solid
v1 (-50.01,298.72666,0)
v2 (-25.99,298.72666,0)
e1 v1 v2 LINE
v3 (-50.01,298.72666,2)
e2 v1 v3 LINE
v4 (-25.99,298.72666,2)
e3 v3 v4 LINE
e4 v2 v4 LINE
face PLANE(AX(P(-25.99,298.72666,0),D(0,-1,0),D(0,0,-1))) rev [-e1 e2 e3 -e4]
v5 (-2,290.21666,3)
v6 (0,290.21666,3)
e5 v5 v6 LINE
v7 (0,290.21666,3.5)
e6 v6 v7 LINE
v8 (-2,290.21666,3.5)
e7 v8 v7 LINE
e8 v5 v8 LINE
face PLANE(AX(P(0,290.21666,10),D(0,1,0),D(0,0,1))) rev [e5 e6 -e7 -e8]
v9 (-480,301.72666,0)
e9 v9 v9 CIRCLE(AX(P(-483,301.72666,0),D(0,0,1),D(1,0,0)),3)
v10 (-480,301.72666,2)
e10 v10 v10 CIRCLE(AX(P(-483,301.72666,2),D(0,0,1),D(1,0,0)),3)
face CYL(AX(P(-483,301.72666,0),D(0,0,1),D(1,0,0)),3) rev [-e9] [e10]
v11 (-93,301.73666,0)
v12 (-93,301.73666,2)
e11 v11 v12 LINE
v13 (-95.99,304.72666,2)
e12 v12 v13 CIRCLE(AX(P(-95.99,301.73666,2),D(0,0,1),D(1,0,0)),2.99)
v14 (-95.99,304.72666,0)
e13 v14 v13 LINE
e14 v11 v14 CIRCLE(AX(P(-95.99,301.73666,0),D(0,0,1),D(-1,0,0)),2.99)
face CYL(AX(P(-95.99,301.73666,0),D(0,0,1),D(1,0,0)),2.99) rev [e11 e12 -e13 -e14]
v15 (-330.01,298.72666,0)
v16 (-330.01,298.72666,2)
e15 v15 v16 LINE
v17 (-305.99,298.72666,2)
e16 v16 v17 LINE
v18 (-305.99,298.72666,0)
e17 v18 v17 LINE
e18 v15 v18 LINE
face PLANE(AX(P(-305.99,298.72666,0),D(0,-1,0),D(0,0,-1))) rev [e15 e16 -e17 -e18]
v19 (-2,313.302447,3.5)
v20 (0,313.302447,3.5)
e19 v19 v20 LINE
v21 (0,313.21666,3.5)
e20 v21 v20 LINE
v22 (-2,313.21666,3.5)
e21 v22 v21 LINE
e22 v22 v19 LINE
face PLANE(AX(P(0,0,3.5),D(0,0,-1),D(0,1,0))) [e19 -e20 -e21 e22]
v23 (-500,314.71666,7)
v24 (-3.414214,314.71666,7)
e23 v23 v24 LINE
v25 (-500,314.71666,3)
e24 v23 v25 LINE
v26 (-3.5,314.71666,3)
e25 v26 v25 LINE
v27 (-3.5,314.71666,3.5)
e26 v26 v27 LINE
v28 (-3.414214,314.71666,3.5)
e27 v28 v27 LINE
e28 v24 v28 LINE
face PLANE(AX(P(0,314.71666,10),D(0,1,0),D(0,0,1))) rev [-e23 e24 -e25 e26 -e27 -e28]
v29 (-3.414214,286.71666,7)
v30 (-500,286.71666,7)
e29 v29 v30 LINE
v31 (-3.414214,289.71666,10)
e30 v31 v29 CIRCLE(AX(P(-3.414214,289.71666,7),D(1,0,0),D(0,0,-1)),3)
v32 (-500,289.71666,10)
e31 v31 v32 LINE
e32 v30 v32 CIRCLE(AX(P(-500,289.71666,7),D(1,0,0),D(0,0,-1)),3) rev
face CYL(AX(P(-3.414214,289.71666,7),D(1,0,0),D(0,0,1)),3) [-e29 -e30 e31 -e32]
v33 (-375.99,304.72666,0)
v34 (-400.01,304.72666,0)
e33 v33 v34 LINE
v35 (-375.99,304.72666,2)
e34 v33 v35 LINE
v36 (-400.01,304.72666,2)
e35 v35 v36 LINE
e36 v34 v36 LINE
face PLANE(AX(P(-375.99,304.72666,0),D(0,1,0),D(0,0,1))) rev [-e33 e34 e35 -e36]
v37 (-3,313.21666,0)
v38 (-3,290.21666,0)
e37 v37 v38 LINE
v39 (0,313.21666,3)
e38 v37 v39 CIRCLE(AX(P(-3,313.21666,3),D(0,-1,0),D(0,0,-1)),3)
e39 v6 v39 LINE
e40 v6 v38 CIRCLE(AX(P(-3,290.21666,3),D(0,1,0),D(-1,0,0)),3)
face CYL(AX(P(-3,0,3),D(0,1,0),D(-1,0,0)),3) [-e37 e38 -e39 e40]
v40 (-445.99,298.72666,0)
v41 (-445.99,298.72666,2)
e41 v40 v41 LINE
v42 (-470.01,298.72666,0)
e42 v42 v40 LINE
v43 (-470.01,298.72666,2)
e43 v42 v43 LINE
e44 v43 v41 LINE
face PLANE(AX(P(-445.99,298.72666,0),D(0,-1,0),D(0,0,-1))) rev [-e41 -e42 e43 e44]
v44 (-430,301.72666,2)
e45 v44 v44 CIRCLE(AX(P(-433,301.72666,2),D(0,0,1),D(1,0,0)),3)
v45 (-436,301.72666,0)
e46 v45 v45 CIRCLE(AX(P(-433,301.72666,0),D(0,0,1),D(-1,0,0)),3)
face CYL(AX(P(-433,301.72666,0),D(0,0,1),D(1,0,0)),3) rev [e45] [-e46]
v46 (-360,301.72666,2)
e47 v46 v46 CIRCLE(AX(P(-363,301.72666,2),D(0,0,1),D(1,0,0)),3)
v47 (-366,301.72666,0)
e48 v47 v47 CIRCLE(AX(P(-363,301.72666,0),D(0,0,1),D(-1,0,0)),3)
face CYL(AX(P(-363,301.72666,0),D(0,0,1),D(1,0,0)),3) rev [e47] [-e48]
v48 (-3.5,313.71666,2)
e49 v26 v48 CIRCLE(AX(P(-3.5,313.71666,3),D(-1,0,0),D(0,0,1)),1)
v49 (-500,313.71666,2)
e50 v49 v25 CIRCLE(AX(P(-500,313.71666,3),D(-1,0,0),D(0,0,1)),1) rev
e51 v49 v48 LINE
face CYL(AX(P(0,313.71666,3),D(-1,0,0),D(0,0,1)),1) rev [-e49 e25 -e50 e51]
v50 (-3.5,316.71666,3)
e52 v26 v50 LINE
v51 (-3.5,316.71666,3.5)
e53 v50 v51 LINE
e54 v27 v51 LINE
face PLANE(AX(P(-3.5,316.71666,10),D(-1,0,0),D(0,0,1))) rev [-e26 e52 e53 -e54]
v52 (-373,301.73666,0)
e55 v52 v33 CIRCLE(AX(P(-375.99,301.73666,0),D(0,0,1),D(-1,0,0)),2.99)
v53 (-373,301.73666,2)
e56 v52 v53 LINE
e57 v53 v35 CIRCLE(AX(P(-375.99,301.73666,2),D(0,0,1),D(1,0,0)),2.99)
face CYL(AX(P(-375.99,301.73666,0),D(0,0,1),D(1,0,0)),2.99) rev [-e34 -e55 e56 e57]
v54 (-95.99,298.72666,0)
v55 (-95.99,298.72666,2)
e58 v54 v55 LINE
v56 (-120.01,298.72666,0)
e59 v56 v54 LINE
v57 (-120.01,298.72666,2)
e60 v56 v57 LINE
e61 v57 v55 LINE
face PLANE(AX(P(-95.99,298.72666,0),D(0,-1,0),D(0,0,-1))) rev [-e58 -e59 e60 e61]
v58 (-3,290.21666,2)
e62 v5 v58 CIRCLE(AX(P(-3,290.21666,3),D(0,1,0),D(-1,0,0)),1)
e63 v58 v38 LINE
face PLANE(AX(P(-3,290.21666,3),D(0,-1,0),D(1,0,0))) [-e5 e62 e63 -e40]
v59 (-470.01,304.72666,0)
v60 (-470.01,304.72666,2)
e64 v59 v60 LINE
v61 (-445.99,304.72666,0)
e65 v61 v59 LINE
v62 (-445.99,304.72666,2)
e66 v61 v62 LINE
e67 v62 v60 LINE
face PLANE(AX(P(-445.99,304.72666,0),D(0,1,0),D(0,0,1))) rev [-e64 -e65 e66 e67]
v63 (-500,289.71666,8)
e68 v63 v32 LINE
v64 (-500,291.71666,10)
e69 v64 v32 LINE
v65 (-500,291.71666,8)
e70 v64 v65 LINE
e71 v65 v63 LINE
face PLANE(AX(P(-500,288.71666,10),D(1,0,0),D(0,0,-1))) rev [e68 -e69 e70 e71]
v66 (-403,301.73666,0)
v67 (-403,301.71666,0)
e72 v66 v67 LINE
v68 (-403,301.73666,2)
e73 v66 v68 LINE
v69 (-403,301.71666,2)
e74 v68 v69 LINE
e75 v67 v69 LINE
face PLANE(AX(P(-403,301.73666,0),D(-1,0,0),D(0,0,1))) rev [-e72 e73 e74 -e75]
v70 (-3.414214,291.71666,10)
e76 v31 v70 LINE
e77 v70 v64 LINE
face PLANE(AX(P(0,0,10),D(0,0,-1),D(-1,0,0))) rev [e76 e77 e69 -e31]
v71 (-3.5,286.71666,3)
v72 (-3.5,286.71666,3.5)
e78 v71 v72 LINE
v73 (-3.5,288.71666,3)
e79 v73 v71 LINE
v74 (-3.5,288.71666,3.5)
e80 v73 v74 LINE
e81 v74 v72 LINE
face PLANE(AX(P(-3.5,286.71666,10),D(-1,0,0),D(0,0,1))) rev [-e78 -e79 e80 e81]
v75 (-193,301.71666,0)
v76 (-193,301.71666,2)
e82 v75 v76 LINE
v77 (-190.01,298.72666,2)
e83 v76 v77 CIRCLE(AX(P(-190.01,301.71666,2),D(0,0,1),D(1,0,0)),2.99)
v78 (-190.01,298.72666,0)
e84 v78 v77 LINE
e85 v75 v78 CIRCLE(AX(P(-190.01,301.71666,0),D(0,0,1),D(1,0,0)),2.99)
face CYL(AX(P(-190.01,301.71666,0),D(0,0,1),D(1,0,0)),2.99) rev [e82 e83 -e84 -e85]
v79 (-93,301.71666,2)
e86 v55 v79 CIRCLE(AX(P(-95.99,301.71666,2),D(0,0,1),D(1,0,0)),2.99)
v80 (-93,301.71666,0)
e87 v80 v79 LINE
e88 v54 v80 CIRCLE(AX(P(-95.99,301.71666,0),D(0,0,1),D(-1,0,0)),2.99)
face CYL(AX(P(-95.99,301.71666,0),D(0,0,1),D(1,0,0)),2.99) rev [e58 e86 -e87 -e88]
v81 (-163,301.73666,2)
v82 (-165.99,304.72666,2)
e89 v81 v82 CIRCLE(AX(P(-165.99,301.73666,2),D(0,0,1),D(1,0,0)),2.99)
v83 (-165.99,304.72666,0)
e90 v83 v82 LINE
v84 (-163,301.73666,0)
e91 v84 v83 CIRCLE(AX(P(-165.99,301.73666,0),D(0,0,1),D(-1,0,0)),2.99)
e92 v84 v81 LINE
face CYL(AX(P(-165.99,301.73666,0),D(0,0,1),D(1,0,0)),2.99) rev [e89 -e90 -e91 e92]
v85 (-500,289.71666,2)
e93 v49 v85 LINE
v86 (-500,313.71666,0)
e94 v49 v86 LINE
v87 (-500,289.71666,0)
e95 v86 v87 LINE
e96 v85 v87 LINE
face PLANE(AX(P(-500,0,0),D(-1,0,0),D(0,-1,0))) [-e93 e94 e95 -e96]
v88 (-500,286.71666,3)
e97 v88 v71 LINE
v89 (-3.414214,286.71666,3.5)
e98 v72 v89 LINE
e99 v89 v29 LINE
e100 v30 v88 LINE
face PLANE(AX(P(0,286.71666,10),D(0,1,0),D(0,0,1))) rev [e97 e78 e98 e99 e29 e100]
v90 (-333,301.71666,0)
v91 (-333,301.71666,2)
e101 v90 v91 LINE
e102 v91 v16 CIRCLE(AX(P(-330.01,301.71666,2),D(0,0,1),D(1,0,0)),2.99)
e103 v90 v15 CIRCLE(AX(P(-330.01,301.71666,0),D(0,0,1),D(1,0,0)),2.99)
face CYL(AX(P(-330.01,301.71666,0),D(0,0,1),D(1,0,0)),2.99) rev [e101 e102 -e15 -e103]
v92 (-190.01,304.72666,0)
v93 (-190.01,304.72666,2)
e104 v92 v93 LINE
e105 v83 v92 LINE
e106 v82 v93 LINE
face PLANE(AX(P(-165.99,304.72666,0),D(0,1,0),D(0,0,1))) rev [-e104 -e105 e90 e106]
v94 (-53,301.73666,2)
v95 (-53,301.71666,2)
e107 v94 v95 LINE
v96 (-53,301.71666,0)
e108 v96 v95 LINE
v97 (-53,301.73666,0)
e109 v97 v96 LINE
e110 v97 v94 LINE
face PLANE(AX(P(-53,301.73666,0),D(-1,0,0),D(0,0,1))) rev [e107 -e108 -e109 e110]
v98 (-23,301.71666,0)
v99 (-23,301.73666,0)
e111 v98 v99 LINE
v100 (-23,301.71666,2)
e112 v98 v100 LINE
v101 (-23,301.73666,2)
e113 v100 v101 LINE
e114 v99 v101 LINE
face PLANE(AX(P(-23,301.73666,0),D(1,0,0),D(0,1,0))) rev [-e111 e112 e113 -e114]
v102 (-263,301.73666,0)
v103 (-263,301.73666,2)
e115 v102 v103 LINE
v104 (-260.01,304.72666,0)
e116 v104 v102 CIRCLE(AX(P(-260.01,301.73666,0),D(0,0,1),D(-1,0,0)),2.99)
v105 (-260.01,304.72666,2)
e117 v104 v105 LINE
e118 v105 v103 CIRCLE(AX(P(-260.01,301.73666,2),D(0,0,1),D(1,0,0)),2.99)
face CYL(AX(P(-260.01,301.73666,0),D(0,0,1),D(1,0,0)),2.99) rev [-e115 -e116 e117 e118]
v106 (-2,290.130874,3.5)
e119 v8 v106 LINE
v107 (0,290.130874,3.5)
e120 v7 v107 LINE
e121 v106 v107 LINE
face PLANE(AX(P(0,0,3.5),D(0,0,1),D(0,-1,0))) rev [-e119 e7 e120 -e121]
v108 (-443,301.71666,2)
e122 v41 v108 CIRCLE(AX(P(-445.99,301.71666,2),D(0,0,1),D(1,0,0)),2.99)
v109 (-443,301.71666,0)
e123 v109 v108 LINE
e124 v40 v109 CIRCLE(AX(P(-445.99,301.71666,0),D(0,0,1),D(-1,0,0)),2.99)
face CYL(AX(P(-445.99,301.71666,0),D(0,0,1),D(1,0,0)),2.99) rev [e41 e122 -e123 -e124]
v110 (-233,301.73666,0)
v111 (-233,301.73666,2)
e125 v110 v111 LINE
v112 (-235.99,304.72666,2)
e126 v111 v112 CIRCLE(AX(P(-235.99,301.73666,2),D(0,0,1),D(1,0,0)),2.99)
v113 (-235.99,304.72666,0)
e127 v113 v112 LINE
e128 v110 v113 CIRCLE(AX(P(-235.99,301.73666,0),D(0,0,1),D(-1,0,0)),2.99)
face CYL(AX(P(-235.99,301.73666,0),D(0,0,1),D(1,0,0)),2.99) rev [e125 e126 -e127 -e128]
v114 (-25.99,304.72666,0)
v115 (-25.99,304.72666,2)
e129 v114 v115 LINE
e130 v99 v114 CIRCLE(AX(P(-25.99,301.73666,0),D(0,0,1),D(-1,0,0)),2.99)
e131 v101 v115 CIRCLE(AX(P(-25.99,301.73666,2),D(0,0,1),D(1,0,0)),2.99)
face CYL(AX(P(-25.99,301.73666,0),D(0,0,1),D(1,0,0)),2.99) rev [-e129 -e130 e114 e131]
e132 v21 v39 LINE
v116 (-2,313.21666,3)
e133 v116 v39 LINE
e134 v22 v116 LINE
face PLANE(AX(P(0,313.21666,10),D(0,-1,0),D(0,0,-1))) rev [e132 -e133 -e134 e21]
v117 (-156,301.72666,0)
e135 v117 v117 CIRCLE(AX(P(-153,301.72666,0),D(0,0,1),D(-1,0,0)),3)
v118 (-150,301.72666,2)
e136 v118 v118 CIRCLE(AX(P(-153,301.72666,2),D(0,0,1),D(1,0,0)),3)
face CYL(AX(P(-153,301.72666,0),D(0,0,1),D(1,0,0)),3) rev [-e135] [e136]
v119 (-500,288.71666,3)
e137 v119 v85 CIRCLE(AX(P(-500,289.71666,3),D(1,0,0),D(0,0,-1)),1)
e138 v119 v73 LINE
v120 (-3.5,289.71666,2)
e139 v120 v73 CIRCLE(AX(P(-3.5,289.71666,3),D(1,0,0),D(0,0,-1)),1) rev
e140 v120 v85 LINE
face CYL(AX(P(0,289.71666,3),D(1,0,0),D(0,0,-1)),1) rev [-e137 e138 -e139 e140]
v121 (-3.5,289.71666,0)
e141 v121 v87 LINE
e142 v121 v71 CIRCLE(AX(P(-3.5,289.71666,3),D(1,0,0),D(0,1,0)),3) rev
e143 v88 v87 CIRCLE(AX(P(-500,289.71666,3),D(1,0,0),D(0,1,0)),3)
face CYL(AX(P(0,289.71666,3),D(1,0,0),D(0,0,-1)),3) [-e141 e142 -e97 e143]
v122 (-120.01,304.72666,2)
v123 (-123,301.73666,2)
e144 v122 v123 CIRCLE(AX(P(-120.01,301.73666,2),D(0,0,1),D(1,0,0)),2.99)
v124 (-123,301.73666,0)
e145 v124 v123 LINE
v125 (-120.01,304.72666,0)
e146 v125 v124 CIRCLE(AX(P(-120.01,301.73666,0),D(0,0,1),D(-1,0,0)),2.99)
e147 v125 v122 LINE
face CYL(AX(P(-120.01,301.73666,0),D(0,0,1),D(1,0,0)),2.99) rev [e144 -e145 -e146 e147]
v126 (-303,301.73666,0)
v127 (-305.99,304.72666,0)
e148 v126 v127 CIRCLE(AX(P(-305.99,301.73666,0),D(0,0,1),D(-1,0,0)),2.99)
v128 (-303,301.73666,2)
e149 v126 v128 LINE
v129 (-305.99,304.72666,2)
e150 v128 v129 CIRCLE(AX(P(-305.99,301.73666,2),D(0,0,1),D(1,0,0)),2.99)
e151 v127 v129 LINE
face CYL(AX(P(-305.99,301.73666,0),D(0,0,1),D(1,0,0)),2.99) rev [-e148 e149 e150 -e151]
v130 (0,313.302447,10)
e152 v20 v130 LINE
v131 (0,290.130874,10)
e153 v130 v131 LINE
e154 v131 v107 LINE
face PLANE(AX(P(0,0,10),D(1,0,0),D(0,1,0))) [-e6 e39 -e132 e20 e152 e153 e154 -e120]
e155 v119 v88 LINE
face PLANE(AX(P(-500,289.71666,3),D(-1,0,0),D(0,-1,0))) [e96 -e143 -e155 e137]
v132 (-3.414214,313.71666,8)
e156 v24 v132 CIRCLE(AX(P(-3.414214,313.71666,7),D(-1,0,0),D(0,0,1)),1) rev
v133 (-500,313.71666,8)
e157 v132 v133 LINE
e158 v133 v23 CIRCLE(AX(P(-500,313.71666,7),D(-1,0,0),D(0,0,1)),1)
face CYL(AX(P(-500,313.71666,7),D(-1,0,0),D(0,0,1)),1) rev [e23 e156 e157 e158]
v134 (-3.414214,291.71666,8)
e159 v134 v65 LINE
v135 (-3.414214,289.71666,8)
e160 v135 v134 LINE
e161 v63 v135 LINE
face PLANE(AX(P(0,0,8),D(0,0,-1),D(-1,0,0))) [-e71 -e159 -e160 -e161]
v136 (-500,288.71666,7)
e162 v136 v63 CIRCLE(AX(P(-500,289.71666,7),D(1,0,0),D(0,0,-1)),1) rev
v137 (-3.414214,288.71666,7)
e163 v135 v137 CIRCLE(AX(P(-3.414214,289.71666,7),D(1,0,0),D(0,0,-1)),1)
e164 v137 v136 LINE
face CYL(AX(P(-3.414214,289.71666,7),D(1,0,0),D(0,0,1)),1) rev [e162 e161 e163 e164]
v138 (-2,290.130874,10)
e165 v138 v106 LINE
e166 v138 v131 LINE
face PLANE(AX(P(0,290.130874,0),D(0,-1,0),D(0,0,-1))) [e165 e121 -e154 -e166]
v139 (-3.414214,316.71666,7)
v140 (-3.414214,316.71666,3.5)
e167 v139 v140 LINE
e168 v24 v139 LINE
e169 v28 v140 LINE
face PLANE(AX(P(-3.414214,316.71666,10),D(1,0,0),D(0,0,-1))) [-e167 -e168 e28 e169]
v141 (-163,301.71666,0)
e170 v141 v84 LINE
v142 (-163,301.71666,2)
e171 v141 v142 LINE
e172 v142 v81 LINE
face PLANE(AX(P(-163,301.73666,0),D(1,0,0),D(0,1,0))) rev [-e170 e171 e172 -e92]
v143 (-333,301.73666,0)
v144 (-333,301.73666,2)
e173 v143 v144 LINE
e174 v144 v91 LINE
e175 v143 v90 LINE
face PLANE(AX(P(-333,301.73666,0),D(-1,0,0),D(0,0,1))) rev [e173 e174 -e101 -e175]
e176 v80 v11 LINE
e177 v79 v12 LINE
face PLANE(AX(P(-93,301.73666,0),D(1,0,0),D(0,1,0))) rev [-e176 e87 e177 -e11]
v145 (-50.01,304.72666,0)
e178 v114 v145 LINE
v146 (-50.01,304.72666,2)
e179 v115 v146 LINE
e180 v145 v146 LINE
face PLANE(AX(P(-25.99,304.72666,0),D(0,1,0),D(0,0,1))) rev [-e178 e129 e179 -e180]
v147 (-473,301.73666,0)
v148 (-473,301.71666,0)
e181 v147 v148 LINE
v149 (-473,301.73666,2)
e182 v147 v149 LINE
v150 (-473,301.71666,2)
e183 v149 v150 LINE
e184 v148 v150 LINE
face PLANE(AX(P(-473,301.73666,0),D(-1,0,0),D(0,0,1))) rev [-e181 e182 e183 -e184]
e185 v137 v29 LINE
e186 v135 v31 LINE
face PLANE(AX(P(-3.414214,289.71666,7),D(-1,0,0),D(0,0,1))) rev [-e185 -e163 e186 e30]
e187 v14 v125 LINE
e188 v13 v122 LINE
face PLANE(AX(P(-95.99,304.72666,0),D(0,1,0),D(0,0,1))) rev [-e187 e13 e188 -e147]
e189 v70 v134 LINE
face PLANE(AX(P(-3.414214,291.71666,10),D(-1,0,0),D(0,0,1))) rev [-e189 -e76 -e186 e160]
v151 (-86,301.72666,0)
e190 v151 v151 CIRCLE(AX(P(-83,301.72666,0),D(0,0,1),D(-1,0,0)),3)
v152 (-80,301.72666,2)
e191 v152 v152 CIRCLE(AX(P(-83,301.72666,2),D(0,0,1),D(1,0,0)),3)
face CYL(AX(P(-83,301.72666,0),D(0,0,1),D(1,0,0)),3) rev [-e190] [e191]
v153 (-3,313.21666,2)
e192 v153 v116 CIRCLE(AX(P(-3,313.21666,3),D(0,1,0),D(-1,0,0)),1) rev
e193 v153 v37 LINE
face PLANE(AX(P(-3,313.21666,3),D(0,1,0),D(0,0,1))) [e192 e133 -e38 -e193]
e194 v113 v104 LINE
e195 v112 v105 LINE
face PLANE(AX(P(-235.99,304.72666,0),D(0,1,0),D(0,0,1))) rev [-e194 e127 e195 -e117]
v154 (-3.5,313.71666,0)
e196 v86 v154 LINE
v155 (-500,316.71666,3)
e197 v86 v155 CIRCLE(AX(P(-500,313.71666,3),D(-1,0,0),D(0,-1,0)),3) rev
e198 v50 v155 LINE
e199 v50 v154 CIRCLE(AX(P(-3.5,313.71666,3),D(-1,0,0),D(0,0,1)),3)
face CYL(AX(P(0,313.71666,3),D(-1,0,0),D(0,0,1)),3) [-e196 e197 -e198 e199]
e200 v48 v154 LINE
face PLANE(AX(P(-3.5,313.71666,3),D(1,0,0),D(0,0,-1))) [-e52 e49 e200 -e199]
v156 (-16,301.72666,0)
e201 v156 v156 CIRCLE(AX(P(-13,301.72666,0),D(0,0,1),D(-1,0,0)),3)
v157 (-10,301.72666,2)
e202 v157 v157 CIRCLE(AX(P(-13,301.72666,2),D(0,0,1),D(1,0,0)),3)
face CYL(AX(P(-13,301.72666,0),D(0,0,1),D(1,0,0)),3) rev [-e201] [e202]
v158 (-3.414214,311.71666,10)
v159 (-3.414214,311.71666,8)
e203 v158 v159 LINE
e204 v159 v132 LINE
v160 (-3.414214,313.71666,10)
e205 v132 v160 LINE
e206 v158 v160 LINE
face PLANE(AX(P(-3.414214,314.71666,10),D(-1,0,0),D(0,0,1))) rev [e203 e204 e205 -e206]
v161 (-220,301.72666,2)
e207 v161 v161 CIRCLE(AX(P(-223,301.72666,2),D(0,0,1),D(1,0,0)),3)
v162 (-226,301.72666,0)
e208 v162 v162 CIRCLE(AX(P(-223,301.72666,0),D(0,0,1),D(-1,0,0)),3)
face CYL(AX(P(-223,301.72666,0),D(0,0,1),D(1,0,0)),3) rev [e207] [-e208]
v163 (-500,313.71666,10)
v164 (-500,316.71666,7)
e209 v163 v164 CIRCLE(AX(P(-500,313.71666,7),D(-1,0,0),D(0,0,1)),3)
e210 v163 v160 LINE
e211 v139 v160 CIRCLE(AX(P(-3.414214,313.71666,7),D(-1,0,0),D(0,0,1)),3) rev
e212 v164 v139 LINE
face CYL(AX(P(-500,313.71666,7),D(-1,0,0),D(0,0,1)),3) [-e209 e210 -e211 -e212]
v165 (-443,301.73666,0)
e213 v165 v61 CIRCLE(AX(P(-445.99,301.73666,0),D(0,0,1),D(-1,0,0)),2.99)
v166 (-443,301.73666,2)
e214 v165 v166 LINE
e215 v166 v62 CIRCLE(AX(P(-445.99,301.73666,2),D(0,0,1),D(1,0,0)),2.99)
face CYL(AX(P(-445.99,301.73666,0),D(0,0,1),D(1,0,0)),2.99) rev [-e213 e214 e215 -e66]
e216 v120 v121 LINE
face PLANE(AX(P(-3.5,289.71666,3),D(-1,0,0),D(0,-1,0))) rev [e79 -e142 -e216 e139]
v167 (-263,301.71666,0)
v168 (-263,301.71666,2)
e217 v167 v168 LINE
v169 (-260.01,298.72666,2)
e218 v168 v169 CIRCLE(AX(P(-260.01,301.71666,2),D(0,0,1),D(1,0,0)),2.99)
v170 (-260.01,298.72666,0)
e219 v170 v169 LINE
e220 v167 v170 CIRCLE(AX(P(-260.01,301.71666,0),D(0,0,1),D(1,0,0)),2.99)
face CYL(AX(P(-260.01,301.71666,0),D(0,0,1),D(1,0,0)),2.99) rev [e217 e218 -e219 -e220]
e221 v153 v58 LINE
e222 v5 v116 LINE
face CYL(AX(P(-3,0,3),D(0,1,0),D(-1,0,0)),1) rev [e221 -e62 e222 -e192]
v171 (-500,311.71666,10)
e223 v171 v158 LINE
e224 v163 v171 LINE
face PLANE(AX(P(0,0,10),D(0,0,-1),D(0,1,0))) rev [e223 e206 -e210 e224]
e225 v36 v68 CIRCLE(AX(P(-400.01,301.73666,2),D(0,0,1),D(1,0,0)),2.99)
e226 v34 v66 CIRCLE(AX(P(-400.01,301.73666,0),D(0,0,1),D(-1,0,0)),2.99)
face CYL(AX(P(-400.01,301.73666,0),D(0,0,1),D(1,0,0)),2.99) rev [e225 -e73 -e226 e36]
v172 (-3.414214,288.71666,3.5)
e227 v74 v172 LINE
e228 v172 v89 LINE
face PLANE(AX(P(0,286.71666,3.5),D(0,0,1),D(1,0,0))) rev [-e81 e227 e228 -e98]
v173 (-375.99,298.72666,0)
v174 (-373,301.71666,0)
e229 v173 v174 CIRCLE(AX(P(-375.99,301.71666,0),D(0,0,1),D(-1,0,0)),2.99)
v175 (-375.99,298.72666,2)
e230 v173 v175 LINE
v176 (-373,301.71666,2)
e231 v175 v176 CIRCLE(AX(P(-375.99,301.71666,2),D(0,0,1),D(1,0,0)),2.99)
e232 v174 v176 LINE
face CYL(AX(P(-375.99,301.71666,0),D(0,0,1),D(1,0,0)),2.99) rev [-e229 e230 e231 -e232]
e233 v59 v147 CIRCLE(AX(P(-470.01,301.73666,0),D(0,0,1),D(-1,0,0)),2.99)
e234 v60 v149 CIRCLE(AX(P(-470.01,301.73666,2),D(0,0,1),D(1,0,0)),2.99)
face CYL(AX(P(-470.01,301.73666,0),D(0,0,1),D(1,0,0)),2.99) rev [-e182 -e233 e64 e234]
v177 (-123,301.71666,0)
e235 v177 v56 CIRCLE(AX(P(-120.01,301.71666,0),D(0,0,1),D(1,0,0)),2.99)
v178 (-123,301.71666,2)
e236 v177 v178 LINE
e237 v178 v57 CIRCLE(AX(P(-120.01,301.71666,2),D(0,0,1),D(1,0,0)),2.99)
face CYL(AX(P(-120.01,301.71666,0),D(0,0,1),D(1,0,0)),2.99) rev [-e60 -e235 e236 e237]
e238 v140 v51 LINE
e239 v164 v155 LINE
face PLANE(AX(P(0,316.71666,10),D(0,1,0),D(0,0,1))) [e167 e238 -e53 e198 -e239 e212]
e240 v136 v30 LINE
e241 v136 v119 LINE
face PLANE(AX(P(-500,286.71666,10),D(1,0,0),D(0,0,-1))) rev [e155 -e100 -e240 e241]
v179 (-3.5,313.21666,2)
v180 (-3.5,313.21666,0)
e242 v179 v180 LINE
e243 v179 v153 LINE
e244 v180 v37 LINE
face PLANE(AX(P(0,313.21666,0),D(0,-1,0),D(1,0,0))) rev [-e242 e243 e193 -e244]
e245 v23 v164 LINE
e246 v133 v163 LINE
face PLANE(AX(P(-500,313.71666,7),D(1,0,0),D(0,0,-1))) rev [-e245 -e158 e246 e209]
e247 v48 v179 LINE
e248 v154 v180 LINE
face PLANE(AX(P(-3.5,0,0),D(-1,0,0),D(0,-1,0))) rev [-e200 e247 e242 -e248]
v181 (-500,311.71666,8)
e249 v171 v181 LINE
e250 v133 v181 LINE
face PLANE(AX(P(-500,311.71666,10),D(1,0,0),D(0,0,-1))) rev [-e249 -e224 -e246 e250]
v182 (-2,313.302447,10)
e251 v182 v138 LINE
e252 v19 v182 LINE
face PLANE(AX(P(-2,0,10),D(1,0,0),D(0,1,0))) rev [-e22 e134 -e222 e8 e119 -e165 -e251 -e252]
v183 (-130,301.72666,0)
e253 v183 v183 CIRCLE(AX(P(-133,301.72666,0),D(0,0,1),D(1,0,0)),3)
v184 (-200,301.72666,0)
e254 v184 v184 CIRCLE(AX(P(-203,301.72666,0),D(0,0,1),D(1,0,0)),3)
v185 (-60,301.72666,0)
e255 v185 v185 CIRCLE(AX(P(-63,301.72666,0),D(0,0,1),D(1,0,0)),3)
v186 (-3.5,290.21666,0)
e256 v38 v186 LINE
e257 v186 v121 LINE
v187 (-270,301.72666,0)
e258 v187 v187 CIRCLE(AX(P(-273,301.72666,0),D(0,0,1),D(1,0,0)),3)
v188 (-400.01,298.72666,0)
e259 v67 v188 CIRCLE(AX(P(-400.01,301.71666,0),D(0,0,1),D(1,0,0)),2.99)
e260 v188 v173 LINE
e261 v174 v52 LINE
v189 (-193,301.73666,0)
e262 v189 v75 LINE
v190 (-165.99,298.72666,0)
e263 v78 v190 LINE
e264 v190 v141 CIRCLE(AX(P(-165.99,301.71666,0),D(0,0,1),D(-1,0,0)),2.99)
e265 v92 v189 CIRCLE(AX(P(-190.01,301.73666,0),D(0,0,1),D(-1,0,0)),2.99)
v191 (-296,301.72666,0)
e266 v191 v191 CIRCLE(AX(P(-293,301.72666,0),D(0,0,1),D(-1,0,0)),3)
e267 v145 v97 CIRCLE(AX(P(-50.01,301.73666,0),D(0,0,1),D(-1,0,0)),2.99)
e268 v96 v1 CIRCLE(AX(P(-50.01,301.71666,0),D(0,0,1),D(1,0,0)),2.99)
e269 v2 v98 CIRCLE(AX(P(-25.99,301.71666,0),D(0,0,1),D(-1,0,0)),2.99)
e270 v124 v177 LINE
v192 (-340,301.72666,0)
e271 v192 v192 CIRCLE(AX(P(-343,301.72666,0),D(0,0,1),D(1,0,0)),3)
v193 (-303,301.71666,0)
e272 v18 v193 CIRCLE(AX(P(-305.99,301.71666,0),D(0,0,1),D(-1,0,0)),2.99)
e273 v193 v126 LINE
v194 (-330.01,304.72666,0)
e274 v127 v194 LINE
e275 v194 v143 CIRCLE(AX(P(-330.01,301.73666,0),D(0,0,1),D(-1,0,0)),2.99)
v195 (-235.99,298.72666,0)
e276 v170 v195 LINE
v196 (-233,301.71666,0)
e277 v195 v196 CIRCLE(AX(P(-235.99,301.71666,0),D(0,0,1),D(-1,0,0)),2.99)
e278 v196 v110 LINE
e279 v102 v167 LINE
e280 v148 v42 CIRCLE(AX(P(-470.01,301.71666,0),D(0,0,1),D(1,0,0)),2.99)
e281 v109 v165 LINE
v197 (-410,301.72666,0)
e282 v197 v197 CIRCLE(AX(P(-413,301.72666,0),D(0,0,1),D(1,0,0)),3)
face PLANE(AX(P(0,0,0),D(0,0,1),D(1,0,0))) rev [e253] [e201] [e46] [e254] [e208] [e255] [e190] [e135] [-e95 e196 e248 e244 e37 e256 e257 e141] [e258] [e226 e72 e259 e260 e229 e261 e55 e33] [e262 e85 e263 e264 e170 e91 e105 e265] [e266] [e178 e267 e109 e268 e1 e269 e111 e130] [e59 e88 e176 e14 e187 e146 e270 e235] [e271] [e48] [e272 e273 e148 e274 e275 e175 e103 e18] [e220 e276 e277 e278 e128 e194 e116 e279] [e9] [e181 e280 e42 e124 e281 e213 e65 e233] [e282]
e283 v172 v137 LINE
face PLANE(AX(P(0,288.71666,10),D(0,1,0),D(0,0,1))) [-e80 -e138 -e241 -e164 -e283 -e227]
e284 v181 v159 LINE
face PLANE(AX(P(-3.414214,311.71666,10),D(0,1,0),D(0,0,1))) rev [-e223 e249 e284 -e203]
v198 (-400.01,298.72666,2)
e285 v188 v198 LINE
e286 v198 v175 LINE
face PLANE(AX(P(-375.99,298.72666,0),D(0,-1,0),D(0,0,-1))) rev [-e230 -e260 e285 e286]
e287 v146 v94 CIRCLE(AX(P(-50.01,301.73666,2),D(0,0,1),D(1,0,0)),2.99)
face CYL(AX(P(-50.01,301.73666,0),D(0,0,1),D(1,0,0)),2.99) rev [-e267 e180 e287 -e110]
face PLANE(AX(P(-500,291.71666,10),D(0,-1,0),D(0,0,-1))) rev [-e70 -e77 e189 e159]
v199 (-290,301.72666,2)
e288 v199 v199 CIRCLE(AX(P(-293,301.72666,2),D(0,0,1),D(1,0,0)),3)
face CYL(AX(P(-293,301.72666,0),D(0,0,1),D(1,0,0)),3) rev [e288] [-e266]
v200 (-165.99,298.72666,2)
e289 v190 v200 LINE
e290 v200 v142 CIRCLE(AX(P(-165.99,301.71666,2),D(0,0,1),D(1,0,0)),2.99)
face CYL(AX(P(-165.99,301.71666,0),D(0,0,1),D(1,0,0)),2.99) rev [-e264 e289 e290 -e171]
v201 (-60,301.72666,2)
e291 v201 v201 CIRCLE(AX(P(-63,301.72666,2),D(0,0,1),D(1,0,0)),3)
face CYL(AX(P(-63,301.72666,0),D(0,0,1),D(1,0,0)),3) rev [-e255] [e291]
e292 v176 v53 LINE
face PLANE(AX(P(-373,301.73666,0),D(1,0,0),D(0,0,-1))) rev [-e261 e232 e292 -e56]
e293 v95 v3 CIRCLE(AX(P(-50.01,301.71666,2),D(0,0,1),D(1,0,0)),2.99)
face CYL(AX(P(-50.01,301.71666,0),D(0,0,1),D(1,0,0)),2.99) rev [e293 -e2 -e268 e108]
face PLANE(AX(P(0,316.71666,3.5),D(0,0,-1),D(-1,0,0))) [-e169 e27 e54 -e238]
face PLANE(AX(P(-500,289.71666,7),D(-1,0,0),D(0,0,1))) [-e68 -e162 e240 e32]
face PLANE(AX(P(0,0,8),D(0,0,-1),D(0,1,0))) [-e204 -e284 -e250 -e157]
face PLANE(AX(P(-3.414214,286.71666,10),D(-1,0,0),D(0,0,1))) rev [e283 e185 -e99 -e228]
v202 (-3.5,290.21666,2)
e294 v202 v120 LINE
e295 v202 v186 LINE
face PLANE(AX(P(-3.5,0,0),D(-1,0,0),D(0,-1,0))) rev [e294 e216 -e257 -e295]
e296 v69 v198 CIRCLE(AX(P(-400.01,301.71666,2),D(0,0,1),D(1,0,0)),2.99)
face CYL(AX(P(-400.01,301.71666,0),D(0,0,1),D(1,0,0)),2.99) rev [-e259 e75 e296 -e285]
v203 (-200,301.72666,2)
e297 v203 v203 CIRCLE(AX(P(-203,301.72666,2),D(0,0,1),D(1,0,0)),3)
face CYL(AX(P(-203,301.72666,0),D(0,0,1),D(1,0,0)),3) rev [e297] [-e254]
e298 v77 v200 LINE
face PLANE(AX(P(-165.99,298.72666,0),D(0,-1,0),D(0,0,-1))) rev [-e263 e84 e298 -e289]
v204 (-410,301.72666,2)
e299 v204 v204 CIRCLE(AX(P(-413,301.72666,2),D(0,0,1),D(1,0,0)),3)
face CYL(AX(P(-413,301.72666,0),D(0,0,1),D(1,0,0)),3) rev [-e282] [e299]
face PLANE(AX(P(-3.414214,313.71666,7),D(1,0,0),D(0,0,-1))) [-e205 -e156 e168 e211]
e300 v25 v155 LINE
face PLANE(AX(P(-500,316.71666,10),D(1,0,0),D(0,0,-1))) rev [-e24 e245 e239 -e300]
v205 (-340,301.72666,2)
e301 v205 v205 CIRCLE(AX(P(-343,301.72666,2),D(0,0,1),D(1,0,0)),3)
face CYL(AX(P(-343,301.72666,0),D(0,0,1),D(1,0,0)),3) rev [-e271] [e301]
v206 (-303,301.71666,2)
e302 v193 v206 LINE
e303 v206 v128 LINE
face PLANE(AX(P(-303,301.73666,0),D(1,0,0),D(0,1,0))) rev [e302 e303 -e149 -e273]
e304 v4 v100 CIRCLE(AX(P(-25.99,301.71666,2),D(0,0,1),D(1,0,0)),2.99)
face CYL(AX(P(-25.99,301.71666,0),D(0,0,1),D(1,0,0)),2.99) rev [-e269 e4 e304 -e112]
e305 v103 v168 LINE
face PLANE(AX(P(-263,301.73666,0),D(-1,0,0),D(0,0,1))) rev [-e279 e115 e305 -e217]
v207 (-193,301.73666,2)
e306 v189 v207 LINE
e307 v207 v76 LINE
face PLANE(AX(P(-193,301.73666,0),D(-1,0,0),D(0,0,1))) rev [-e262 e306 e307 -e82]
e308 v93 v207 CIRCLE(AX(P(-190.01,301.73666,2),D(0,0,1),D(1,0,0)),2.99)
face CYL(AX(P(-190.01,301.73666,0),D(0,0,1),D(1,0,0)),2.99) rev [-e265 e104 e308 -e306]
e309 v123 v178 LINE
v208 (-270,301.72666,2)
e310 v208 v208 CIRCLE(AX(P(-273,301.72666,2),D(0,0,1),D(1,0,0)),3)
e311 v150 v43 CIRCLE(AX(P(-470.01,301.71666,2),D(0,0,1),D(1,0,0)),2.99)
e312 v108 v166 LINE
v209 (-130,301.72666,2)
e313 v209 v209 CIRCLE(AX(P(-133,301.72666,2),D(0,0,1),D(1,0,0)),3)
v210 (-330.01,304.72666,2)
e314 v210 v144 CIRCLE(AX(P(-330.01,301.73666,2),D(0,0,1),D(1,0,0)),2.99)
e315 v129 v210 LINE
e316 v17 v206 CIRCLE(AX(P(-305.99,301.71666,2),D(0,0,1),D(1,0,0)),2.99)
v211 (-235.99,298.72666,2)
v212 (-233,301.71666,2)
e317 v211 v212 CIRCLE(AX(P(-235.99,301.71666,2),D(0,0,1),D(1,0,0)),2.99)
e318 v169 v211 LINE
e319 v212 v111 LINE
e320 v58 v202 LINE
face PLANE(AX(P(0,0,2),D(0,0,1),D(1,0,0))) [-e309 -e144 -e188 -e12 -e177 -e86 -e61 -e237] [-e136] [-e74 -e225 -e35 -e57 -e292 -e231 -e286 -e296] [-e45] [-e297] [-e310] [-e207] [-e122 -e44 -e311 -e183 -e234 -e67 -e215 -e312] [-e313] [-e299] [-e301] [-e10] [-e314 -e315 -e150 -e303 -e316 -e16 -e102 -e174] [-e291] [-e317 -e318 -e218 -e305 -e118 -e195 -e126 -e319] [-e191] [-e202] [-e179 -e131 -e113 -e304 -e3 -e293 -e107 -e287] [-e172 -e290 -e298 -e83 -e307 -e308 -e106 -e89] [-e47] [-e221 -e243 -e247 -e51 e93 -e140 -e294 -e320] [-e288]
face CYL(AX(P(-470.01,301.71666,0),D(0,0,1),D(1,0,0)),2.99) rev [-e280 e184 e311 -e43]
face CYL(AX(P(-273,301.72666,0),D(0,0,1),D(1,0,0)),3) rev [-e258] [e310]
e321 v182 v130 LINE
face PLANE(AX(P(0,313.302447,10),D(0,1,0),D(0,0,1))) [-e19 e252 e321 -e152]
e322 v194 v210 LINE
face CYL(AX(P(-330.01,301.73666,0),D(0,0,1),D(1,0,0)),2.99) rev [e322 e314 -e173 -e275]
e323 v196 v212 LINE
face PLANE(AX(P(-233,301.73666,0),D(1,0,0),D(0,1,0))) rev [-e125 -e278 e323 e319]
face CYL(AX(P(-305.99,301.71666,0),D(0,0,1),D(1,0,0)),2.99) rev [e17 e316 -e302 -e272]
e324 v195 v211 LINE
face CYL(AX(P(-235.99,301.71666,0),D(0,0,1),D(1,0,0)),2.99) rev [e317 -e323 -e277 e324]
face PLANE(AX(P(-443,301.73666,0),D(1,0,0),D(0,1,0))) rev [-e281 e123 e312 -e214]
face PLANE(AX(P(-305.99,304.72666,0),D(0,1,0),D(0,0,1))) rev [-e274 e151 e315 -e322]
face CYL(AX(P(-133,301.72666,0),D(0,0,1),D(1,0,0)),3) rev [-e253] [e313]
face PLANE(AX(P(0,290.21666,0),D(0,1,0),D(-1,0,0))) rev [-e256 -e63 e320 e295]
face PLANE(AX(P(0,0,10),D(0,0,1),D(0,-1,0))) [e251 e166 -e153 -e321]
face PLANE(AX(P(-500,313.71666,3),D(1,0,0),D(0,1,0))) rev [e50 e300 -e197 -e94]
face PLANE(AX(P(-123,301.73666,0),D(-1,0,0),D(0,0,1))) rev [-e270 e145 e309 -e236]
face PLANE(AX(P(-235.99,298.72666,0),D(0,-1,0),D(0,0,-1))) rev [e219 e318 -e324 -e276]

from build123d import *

# Parameters (mm, degrees)
SKETCH2_W                      = 500
SKETCH2_H                      = 30
BOSS_EXTRUDE1_DEPTH            = 10
CONVERT_SOLID1_START           = -500
CONVERT_SOLID1_DEPTH           = 497
CONVERT_SOLID1_START_2         = -3.414213562
CONVERT_SOLID1_2_DEPTH         = 3.414213562
CONVERT_SOLID1_START_3         = -3.5
CONVERT_SOLID1_3_DEPTH         = 0.085786438
CONVERT_SOLID1_START_4         = 290.130873959
CONVERT_SOLID1_4_DEPTH         = 23.171572876
EDGE_FLANGE1_STRIP_W           = 10
EDGE_FLANGE1_STRIP_H           = 2
EDGE_FLANGE1_STRIP_CUT_DEPTH   = 496.585786438
EDGE_FLANGE1_STRIP_2_W         = 10
EDGE_FLANGE1_STRIP_2_H         = 2
EDGE_FLANGE1_STRIP_CUT_2_DEPTH = 496.585786438
EDGE_FLANGE1_DEPTH             = 496.585786438
EDGE_FLANGE1_BEND_DEPTH        = 496.585786438
CUT_EXTRUDE1_DEPTH             = 592.923511083
CUT_EXTRUDE1_DEPTH_BACK        = 592.923511083
SKETCH43_R                     = 3


with BuildPart() as part:
    # Sketch2 → Boss-Extrude1 (new body)
    with BuildSketch(Plane.XY):
        with Locations((-250, 301.716660397)):
            Rectangle(SKETCH2_W, SKETCH2_H)
    extrude(amount=BOSS_EXTRUDE1_DEPTH)

    # Convert-Solid1: read off the stored shape, not the designer's step
    # Convert-Solid1 outline → Convert-Solid1 (cut)
    with BuildSketch(Plane.YZ.offset(CONVERT_SOLID1_START)):
        with BuildLine():
            Line((314.716660397, 3), (314.716660397, 10))
            Line((314.716660397, 10), (288.716660397, 10))
            Line((288.716660397, 10), (288.716660397, 3))
            ThreePointArc((288.716660397, 3), (289.009553616, 2.292893219), (289.716660397, 2))
            Line((289.716660397, 2), (313.716660397, 2))
            ThreePointArc((313.716660397, 2), (314.423767178, 2.292893219), (314.716660397, 3))
        make_face()
        with BuildLine():
            Line((316.716660397, 0), (316.716660397, 3))
            ThreePointArc((316.716660397, 3), (315.837980741, 0.878679656), (313.716660397, 0))
            Line((313.716660397, 0), (316.716660397, 0))
        make_face()
        with BuildLine():
            Line((286.716660397, 0), (289.716660397, 0))
            ThreePointArc((289.716660397, 0), (287.595340053, 0.878679656), (286.716660397, 3))
            Line((286.716660397, 3), (286.716660397, 0))
        make_face()
    extrude(amount=CONVERT_SOLID1_DEPTH, mode=Mode.SUBTRACT)

    # Convert-Solid1 2 outline → Convert-Solid1 2 (cut)
    with BuildSketch(Plane.YZ.offset(CONVERT_SOLID1_START_2)):
        Polygon((316.716660397, 10), (313.302446835, 10), (313.302446835, 3.5), (313.216660397, 3.5), (313.216660397, 0), (316.716660397, 0), align=None)
        Polygon((290.130873959, 3.5), (290.130873959, 10), (286.716660397, 10), (286.716660397, 0), (290.216660397, 0), (290.216660397, 3.5), align=None)
    extrude(amount=CONVERT_SOLID1_2_DEPTH, mode=Mode.SUBTRACT)

    # Convert-Solid1 3 outline → Convert-Solid1 3 (cut)
    with BuildSketch(Plane.YZ.offset(CONVERT_SOLID1_START_3)):
        with BuildLine():
            Line((316.716660397, 3.5), (314.716660397, 3.5))
            Line((314.716660397, 3.5), (314.716660397, 3))
            ThreePointArc((314.716660397, 3), (314.423767178, 2.292893219), (313.716660397, 2))
            Line((313.716660397, 2), (313.216660397, 2))
            Line((313.216660397, 2), (313.216660397, 0))
            Line((313.216660397, 0), (313.716660397, 0))
            ThreePointArc((313.716660397, 0), (315.837980741, 0.878679656), (316.716660397, 3))
            Line((316.716660397, 3), (316.716660397, 3.5))
        make_face()
        with BuildLine():
            Line((290.216660397, 0), (290.216660397, 2))
            Line((290.216660397, 2), (289.716660397, 2))
            ThreePointArc((289.716660397, 2), (289.009553616, 2.292893219), (288.716660397, 3))
            Line((288.716660397, 3), (288.716660397, 3.5))
            Line((288.716660397, 3.5), (286.716660397, 3.5))
            Line((286.716660397, 3.5), (286.716660397, 3))
            ThreePointArc((286.716660397, 3), (287.595340053, 0.878679656), (289.716660397, 0))
            Line((289.716660397, 0), (290.216660397, 0))
        make_face()
    extrude(amount=CONVERT_SOLID1_3_DEPTH, mode=Mode.SUBTRACT)

    # Convert-Solid1 4 outline → Convert-Solid1 4 (cut)
    with BuildSketch(Plane(origin=(0, 0, 0), x_dir=(1, 0, 0), z_dir=(0, 1, 0)).offset(CONVERT_SOLID1_START_4)):
        with BuildLine():
            ThreePointArc((-3, 0), (-0.878679656, -0.878679656), (0, -3))
            Line((0, -3), (0, 0))
            Line((0, 0), (-3, 0))
        make_face()
        with BuildLine():
            Line((-3, -2), (-3, -10))
            Line((-3, -10), (-2, -10))
            Line((-2, -10), (-2, -3))
            ThreePointArc((-2, -3), (-2.292893219, -2.292893219), (-3, -2))
        make_face()
    extrude(amount=CONVERT_SOLID1_4_DEPTH, mode=Mode.SUBTRACT)

    # Edge-Flange1: sheet metal written as solids
    # Edge-Flange1 strip (on a plane across the edge) → Edge-Flange1 strip cut (cut)
    with BuildSketch(Plane(origin=(-3.414213562, 314.716660397, 10), x_dir=(0, 0, -1), z_dir=(-1, 0, 0))):
        with Locations((-2, -1)):
            Rectangle(EDGE_FLANGE1_STRIP_W, EDGE_FLANGE1_STRIP_H)
    extrude(amount=EDGE_FLANGE1_STRIP_CUT_DEPTH, mode=Mode.SUBTRACT)

    # Edge-Flange1 strip 2 (on a plane across the edge) → Edge-Flange1 strip cut 2 (cut)
    with BuildSketch(Plane(origin=(-500, 288.716660397, 10), x_dir=(0, 0, -1), z_dir=(1, 0, 0))):
        with Locations((-2, -1)):
            Rectangle(EDGE_FLANGE1_STRIP_2_W, EDGE_FLANGE1_STRIP_2_H)
    extrude(amount=EDGE_FLANGE1_STRIP_CUT_2_DEPTH, mode=Mode.SUBTRACT)

    # Edge-Flange1 section (on a plane across the edge) → Edge-Flange1 (add)
    with BuildSketch(Plane(origin=(-3.414213562, 314.716660397, 10), x_dir=(0, 0, -1), z_dir=(-1, 0, 0))):
        with BuildLine():
            Line((0, 1), (0, 3))
            Line((0, 3), (2, 3))
            Line((2, 3), (2, 1))
            ThreePointArc((2, 1), (2.292893219, 0.292893219), (3, 0))
            Line((3, 0), (3, -2))
            ThreePointArc((3, -2), (0.878679656, -1.121320344), (0, 1))
        make_face()
    extrude(amount=EDGE_FLANGE1_DEPTH)

    # Edge-Flange1 section 2 (on a plane across the edge) → Edge-Flange1 bend (add)
    with BuildSketch(Plane(origin=(-500, 288.716660397, 10), x_dir=(0, 0, -1), z_dir=(1, 0, 0))):
        with BuildLine():
            Line((0, 1), (0, 3))
            Line((0, 3), (2, 3))
            Line((2, 3), (2, 1))
            ThreePointArc((2, 1), (2.292893219, 0.292893219), (3, 0))
            Line((3, 0), (3, -2))
            ThreePointArc((3, -2), (0.878679656, -1.121320344), (0, 1))
        make_face()
    extrude(amount=EDGE_FLANGE1_BEND_DEPTH)

    # Sketch43 → Cut-Extrude1 (cut, two sides: drawn at the far end of the back side and taken through both)
    with BuildSketch(Plane.XY.offset(2).offset(-CUT_EXTRUDE1_DEPTH_BACK)):
        with Locations((-63, 301.726660397)):
            Circle(SKETCH43_R)
        with Locations((-13, 301.726660397)):
            Circle(SKETCH43_R)
        with Locations((-133, 301.726660397)):
            Circle(SKETCH43_R)
        with Locations((-83, 301.726660397)):
            Circle(SKETCH43_R)
        with Locations((-203, 301.726660397)):
            Circle(SKETCH43_R)
        with Locations((-153, 301.726660397)):
            Circle(SKETCH43_R)
        with Locations((-273, 301.726660397)):
            Circle(SKETCH43_R)
        with Locations((-223, 301.726660397)):
            Circle(SKETCH43_R)
        with Locations((-343, 301.726660397)):
            Circle(SKETCH43_R)
        with Locations((-293, 301.726660397)):
            Circle(SKETCH43_R)
        with Locations((-413, 301.726660397)):
            Circle(SKETCH43_R)
        with Locations((-363, 301.726660397)):
            Circle(SKETCH43_R)
        with Locations((-483, 301.726660397)):
            Circle(SKETCH43_R)
        with Locations((-433, 301.726660397)):
            Circle(SKETCH43_R)
        with BuildLine():
            Line((-25.99, 304.726660397), (-50.01, 304.726660397))
            ThreePointArc((-50.01, 304.726660397), (-52.124249276, 303.850909673), (-53, 301.736660397))
            Line((-53, 301.736660397), (-53, 301.716660397))
            ThreePointArc((-53, 301.716660397), (-52.124249276, 299.602411121), (-50.01, 298.726660397))
            Line((-50.01, 298.726660397), (-25.99, 298.726660397))
            ThreePointArc((-25.99, 298.726660397), (-23.875750724, 299.602411121), (-23, 301.716660397))
            Line((-23, 301.716660397), (-23, 301.736660397))
            ThreePointArc((-23, 301.736660397), (-23.875750724, 303.850909673), (-25.99, 304.726660397))
        make_face()
        with BuildLine():
            Line((-93, 301.736660397), (-93, 301.716660397))
            ThreePointArc((-93, 301.716660397), (-93.875750724, 299.602411121), (-95.99, 298.726660397))
            Line((-95.99, 298.726660397), (-120.01, 298.726660397))
            ThreePointArc((-120.01, 298.726660397), (-122.124249276, 299.602411121), (-123, 301.716660397))
            Line((-123, 301.716660397), (-123, 301.736660397))
            ThreePointArc((-123, 301.736660397), (-122.124249276, 303.850909673), (-120.01, 304.726660397))
            Line((-120.01, 304.726660397), (-95.99, 304.726660397))
            ThreePointArc((-95.99, 304.726660397), (-93.875750724, 303.850909673), (-93, 301.736660397))
        make_face()
        with BuildLine():
            Line((-163, 301.736660397), (-163, 301.716660397))
            ThreePointArc((-163, 301.716660397), (-163.875750724, 299.602411121), (-165.99, 298.726660397))
            Line((-165.99, 298.726660397), (-190.01, 298.726660397))
            ThreePointArc((-190.01, 298.726660397), (-192.124249276, 299.602411121), (-193, 301.716660397))
            Line((-193, 301.716660397), (-193, 301.736660397))
            ThreePointArc((-193, 301.736660397), (-192.124249276, 303.850909673), (-190.01, 304.726660397))
            Line((-190.01, 304.726660397), (-165.99, 304.726660397))
            ThreePointArc((-165.99, 304.726660397), (-163.875750724, 303.850909673), (-163, 301.736660397))
        make_face()
        with BuildLine():
            Line((-233, 301.736660397), (-233, 301.716660397))
            ThreePointArc((-233, 301.716660397), (-233.875750724, 299.602411121), (-235.99, 298.726660397))
            Line((-235.99, 298.726660397), (-260.01, 298.726660397))
            ThreePointArc((-260.01, 298.726660397), (-262.124249276, 299.602411121), (-263, 301.716660397))
            Line((-263, 301.716660397), (-263, 301.736660397))
            ThreePointArc((-263, 301.736660397), (-262.124249276, 303.850909673), (-260.01, 304.726660397))
            Line((-260.01, 304.726660397), (-235.99, 304.726660397))
            ThreePointArc((-235.99, 304.726660397), (-233.875750724, 303.850909673), (-233, 301.736660397))
        make_face()
        with BuildLine():
            Line((-303, 301.736660397), (-303, 301.716660397))
            ThreePointArc((-303, 301.716660397), (-303.875750724, 299.602411121), (-305.99, 298.726660397))
            Line((-305.99, 298.726660397), (-330.01, 298.726660397))
            ThreePointArc((-330.01, 298.726660397), (-332.124249276, 299.602411121), (-333, 301.716660397))
            Line((-333, 301.716660397), (-333, 301.736660397))
            ThreePointArc((-333, 301.736660397), (-332.124249276, 303.850909673), (-330.01, 304.726660397))
            Line((-330.01, 304.726660397), (-305.99, 304.726660397))
            ThreePointArc((-305.99, 304.726660397), (-303.875750724, 303.850909673), (-303, 301.736660397))
        make_face()
        with BuildLine():
            Line((-373, 301.736660397), (-373, 301.716660397))
            ThreePointArc((-373, 301.716660397), (-373.875750724, 299.602411121), (-375.99, 298.726660397))
            Line((-375.99, 298.726660397), (-400.01, 298.726660397))
            ThreePointArc((-400.01, 298.726660397), (-402.124249276, 299.602411121), (-403, 301.716660397))
            Line((-403, 301.716660397), (-403, 301.736660397))
            ThreePointArc((-403, 301.736660397), (-402.124249276, 303.850909673), (-400.01, 304.726660397))
            Line((-400.01, 304.726660397), (-375.99, 304.726660397))
            ThreePointArc((-375.99, 304.726660397), (-373.875750724, 303.850909673), (-373, 301.736660397))
        make_face()
        with BuildLine():
            Line((-443, 301.736660397), (-443, 301.716660397))
            ThreePointArc((-443, 301.716660397), (-443.875750724, 299.602411121), (-445.99, 298.726660397))
            Line((-445.99, 298.726660397), (-470.01, 298.726660397))
            ThreePointArc((-470.01, 298.726660397), (-472.124249276, 299.602411121), (-473, 301.716660397))
            Line((-473, 301.716660397), (-473, 301.736660397))
            ThreePointArc((-473, 301.736660397), (-472.124249276, 303.850909673), (-470.01, 304.726660397))
            Line((-470.01, 304.726660397), (-445.99, 304.726660397))
            ThreePointArc((-445.99, 304.726660397), (-443.875750724, 303.850909673), (-443, 301.736660397))
        make_face()
    extrude(amount=CUT_EXTRUDE1_DEPTH + CUT_EXTRUDE1_DEPTH_BACK, mode=Mode.SUBTRACT)


solid = part.part
